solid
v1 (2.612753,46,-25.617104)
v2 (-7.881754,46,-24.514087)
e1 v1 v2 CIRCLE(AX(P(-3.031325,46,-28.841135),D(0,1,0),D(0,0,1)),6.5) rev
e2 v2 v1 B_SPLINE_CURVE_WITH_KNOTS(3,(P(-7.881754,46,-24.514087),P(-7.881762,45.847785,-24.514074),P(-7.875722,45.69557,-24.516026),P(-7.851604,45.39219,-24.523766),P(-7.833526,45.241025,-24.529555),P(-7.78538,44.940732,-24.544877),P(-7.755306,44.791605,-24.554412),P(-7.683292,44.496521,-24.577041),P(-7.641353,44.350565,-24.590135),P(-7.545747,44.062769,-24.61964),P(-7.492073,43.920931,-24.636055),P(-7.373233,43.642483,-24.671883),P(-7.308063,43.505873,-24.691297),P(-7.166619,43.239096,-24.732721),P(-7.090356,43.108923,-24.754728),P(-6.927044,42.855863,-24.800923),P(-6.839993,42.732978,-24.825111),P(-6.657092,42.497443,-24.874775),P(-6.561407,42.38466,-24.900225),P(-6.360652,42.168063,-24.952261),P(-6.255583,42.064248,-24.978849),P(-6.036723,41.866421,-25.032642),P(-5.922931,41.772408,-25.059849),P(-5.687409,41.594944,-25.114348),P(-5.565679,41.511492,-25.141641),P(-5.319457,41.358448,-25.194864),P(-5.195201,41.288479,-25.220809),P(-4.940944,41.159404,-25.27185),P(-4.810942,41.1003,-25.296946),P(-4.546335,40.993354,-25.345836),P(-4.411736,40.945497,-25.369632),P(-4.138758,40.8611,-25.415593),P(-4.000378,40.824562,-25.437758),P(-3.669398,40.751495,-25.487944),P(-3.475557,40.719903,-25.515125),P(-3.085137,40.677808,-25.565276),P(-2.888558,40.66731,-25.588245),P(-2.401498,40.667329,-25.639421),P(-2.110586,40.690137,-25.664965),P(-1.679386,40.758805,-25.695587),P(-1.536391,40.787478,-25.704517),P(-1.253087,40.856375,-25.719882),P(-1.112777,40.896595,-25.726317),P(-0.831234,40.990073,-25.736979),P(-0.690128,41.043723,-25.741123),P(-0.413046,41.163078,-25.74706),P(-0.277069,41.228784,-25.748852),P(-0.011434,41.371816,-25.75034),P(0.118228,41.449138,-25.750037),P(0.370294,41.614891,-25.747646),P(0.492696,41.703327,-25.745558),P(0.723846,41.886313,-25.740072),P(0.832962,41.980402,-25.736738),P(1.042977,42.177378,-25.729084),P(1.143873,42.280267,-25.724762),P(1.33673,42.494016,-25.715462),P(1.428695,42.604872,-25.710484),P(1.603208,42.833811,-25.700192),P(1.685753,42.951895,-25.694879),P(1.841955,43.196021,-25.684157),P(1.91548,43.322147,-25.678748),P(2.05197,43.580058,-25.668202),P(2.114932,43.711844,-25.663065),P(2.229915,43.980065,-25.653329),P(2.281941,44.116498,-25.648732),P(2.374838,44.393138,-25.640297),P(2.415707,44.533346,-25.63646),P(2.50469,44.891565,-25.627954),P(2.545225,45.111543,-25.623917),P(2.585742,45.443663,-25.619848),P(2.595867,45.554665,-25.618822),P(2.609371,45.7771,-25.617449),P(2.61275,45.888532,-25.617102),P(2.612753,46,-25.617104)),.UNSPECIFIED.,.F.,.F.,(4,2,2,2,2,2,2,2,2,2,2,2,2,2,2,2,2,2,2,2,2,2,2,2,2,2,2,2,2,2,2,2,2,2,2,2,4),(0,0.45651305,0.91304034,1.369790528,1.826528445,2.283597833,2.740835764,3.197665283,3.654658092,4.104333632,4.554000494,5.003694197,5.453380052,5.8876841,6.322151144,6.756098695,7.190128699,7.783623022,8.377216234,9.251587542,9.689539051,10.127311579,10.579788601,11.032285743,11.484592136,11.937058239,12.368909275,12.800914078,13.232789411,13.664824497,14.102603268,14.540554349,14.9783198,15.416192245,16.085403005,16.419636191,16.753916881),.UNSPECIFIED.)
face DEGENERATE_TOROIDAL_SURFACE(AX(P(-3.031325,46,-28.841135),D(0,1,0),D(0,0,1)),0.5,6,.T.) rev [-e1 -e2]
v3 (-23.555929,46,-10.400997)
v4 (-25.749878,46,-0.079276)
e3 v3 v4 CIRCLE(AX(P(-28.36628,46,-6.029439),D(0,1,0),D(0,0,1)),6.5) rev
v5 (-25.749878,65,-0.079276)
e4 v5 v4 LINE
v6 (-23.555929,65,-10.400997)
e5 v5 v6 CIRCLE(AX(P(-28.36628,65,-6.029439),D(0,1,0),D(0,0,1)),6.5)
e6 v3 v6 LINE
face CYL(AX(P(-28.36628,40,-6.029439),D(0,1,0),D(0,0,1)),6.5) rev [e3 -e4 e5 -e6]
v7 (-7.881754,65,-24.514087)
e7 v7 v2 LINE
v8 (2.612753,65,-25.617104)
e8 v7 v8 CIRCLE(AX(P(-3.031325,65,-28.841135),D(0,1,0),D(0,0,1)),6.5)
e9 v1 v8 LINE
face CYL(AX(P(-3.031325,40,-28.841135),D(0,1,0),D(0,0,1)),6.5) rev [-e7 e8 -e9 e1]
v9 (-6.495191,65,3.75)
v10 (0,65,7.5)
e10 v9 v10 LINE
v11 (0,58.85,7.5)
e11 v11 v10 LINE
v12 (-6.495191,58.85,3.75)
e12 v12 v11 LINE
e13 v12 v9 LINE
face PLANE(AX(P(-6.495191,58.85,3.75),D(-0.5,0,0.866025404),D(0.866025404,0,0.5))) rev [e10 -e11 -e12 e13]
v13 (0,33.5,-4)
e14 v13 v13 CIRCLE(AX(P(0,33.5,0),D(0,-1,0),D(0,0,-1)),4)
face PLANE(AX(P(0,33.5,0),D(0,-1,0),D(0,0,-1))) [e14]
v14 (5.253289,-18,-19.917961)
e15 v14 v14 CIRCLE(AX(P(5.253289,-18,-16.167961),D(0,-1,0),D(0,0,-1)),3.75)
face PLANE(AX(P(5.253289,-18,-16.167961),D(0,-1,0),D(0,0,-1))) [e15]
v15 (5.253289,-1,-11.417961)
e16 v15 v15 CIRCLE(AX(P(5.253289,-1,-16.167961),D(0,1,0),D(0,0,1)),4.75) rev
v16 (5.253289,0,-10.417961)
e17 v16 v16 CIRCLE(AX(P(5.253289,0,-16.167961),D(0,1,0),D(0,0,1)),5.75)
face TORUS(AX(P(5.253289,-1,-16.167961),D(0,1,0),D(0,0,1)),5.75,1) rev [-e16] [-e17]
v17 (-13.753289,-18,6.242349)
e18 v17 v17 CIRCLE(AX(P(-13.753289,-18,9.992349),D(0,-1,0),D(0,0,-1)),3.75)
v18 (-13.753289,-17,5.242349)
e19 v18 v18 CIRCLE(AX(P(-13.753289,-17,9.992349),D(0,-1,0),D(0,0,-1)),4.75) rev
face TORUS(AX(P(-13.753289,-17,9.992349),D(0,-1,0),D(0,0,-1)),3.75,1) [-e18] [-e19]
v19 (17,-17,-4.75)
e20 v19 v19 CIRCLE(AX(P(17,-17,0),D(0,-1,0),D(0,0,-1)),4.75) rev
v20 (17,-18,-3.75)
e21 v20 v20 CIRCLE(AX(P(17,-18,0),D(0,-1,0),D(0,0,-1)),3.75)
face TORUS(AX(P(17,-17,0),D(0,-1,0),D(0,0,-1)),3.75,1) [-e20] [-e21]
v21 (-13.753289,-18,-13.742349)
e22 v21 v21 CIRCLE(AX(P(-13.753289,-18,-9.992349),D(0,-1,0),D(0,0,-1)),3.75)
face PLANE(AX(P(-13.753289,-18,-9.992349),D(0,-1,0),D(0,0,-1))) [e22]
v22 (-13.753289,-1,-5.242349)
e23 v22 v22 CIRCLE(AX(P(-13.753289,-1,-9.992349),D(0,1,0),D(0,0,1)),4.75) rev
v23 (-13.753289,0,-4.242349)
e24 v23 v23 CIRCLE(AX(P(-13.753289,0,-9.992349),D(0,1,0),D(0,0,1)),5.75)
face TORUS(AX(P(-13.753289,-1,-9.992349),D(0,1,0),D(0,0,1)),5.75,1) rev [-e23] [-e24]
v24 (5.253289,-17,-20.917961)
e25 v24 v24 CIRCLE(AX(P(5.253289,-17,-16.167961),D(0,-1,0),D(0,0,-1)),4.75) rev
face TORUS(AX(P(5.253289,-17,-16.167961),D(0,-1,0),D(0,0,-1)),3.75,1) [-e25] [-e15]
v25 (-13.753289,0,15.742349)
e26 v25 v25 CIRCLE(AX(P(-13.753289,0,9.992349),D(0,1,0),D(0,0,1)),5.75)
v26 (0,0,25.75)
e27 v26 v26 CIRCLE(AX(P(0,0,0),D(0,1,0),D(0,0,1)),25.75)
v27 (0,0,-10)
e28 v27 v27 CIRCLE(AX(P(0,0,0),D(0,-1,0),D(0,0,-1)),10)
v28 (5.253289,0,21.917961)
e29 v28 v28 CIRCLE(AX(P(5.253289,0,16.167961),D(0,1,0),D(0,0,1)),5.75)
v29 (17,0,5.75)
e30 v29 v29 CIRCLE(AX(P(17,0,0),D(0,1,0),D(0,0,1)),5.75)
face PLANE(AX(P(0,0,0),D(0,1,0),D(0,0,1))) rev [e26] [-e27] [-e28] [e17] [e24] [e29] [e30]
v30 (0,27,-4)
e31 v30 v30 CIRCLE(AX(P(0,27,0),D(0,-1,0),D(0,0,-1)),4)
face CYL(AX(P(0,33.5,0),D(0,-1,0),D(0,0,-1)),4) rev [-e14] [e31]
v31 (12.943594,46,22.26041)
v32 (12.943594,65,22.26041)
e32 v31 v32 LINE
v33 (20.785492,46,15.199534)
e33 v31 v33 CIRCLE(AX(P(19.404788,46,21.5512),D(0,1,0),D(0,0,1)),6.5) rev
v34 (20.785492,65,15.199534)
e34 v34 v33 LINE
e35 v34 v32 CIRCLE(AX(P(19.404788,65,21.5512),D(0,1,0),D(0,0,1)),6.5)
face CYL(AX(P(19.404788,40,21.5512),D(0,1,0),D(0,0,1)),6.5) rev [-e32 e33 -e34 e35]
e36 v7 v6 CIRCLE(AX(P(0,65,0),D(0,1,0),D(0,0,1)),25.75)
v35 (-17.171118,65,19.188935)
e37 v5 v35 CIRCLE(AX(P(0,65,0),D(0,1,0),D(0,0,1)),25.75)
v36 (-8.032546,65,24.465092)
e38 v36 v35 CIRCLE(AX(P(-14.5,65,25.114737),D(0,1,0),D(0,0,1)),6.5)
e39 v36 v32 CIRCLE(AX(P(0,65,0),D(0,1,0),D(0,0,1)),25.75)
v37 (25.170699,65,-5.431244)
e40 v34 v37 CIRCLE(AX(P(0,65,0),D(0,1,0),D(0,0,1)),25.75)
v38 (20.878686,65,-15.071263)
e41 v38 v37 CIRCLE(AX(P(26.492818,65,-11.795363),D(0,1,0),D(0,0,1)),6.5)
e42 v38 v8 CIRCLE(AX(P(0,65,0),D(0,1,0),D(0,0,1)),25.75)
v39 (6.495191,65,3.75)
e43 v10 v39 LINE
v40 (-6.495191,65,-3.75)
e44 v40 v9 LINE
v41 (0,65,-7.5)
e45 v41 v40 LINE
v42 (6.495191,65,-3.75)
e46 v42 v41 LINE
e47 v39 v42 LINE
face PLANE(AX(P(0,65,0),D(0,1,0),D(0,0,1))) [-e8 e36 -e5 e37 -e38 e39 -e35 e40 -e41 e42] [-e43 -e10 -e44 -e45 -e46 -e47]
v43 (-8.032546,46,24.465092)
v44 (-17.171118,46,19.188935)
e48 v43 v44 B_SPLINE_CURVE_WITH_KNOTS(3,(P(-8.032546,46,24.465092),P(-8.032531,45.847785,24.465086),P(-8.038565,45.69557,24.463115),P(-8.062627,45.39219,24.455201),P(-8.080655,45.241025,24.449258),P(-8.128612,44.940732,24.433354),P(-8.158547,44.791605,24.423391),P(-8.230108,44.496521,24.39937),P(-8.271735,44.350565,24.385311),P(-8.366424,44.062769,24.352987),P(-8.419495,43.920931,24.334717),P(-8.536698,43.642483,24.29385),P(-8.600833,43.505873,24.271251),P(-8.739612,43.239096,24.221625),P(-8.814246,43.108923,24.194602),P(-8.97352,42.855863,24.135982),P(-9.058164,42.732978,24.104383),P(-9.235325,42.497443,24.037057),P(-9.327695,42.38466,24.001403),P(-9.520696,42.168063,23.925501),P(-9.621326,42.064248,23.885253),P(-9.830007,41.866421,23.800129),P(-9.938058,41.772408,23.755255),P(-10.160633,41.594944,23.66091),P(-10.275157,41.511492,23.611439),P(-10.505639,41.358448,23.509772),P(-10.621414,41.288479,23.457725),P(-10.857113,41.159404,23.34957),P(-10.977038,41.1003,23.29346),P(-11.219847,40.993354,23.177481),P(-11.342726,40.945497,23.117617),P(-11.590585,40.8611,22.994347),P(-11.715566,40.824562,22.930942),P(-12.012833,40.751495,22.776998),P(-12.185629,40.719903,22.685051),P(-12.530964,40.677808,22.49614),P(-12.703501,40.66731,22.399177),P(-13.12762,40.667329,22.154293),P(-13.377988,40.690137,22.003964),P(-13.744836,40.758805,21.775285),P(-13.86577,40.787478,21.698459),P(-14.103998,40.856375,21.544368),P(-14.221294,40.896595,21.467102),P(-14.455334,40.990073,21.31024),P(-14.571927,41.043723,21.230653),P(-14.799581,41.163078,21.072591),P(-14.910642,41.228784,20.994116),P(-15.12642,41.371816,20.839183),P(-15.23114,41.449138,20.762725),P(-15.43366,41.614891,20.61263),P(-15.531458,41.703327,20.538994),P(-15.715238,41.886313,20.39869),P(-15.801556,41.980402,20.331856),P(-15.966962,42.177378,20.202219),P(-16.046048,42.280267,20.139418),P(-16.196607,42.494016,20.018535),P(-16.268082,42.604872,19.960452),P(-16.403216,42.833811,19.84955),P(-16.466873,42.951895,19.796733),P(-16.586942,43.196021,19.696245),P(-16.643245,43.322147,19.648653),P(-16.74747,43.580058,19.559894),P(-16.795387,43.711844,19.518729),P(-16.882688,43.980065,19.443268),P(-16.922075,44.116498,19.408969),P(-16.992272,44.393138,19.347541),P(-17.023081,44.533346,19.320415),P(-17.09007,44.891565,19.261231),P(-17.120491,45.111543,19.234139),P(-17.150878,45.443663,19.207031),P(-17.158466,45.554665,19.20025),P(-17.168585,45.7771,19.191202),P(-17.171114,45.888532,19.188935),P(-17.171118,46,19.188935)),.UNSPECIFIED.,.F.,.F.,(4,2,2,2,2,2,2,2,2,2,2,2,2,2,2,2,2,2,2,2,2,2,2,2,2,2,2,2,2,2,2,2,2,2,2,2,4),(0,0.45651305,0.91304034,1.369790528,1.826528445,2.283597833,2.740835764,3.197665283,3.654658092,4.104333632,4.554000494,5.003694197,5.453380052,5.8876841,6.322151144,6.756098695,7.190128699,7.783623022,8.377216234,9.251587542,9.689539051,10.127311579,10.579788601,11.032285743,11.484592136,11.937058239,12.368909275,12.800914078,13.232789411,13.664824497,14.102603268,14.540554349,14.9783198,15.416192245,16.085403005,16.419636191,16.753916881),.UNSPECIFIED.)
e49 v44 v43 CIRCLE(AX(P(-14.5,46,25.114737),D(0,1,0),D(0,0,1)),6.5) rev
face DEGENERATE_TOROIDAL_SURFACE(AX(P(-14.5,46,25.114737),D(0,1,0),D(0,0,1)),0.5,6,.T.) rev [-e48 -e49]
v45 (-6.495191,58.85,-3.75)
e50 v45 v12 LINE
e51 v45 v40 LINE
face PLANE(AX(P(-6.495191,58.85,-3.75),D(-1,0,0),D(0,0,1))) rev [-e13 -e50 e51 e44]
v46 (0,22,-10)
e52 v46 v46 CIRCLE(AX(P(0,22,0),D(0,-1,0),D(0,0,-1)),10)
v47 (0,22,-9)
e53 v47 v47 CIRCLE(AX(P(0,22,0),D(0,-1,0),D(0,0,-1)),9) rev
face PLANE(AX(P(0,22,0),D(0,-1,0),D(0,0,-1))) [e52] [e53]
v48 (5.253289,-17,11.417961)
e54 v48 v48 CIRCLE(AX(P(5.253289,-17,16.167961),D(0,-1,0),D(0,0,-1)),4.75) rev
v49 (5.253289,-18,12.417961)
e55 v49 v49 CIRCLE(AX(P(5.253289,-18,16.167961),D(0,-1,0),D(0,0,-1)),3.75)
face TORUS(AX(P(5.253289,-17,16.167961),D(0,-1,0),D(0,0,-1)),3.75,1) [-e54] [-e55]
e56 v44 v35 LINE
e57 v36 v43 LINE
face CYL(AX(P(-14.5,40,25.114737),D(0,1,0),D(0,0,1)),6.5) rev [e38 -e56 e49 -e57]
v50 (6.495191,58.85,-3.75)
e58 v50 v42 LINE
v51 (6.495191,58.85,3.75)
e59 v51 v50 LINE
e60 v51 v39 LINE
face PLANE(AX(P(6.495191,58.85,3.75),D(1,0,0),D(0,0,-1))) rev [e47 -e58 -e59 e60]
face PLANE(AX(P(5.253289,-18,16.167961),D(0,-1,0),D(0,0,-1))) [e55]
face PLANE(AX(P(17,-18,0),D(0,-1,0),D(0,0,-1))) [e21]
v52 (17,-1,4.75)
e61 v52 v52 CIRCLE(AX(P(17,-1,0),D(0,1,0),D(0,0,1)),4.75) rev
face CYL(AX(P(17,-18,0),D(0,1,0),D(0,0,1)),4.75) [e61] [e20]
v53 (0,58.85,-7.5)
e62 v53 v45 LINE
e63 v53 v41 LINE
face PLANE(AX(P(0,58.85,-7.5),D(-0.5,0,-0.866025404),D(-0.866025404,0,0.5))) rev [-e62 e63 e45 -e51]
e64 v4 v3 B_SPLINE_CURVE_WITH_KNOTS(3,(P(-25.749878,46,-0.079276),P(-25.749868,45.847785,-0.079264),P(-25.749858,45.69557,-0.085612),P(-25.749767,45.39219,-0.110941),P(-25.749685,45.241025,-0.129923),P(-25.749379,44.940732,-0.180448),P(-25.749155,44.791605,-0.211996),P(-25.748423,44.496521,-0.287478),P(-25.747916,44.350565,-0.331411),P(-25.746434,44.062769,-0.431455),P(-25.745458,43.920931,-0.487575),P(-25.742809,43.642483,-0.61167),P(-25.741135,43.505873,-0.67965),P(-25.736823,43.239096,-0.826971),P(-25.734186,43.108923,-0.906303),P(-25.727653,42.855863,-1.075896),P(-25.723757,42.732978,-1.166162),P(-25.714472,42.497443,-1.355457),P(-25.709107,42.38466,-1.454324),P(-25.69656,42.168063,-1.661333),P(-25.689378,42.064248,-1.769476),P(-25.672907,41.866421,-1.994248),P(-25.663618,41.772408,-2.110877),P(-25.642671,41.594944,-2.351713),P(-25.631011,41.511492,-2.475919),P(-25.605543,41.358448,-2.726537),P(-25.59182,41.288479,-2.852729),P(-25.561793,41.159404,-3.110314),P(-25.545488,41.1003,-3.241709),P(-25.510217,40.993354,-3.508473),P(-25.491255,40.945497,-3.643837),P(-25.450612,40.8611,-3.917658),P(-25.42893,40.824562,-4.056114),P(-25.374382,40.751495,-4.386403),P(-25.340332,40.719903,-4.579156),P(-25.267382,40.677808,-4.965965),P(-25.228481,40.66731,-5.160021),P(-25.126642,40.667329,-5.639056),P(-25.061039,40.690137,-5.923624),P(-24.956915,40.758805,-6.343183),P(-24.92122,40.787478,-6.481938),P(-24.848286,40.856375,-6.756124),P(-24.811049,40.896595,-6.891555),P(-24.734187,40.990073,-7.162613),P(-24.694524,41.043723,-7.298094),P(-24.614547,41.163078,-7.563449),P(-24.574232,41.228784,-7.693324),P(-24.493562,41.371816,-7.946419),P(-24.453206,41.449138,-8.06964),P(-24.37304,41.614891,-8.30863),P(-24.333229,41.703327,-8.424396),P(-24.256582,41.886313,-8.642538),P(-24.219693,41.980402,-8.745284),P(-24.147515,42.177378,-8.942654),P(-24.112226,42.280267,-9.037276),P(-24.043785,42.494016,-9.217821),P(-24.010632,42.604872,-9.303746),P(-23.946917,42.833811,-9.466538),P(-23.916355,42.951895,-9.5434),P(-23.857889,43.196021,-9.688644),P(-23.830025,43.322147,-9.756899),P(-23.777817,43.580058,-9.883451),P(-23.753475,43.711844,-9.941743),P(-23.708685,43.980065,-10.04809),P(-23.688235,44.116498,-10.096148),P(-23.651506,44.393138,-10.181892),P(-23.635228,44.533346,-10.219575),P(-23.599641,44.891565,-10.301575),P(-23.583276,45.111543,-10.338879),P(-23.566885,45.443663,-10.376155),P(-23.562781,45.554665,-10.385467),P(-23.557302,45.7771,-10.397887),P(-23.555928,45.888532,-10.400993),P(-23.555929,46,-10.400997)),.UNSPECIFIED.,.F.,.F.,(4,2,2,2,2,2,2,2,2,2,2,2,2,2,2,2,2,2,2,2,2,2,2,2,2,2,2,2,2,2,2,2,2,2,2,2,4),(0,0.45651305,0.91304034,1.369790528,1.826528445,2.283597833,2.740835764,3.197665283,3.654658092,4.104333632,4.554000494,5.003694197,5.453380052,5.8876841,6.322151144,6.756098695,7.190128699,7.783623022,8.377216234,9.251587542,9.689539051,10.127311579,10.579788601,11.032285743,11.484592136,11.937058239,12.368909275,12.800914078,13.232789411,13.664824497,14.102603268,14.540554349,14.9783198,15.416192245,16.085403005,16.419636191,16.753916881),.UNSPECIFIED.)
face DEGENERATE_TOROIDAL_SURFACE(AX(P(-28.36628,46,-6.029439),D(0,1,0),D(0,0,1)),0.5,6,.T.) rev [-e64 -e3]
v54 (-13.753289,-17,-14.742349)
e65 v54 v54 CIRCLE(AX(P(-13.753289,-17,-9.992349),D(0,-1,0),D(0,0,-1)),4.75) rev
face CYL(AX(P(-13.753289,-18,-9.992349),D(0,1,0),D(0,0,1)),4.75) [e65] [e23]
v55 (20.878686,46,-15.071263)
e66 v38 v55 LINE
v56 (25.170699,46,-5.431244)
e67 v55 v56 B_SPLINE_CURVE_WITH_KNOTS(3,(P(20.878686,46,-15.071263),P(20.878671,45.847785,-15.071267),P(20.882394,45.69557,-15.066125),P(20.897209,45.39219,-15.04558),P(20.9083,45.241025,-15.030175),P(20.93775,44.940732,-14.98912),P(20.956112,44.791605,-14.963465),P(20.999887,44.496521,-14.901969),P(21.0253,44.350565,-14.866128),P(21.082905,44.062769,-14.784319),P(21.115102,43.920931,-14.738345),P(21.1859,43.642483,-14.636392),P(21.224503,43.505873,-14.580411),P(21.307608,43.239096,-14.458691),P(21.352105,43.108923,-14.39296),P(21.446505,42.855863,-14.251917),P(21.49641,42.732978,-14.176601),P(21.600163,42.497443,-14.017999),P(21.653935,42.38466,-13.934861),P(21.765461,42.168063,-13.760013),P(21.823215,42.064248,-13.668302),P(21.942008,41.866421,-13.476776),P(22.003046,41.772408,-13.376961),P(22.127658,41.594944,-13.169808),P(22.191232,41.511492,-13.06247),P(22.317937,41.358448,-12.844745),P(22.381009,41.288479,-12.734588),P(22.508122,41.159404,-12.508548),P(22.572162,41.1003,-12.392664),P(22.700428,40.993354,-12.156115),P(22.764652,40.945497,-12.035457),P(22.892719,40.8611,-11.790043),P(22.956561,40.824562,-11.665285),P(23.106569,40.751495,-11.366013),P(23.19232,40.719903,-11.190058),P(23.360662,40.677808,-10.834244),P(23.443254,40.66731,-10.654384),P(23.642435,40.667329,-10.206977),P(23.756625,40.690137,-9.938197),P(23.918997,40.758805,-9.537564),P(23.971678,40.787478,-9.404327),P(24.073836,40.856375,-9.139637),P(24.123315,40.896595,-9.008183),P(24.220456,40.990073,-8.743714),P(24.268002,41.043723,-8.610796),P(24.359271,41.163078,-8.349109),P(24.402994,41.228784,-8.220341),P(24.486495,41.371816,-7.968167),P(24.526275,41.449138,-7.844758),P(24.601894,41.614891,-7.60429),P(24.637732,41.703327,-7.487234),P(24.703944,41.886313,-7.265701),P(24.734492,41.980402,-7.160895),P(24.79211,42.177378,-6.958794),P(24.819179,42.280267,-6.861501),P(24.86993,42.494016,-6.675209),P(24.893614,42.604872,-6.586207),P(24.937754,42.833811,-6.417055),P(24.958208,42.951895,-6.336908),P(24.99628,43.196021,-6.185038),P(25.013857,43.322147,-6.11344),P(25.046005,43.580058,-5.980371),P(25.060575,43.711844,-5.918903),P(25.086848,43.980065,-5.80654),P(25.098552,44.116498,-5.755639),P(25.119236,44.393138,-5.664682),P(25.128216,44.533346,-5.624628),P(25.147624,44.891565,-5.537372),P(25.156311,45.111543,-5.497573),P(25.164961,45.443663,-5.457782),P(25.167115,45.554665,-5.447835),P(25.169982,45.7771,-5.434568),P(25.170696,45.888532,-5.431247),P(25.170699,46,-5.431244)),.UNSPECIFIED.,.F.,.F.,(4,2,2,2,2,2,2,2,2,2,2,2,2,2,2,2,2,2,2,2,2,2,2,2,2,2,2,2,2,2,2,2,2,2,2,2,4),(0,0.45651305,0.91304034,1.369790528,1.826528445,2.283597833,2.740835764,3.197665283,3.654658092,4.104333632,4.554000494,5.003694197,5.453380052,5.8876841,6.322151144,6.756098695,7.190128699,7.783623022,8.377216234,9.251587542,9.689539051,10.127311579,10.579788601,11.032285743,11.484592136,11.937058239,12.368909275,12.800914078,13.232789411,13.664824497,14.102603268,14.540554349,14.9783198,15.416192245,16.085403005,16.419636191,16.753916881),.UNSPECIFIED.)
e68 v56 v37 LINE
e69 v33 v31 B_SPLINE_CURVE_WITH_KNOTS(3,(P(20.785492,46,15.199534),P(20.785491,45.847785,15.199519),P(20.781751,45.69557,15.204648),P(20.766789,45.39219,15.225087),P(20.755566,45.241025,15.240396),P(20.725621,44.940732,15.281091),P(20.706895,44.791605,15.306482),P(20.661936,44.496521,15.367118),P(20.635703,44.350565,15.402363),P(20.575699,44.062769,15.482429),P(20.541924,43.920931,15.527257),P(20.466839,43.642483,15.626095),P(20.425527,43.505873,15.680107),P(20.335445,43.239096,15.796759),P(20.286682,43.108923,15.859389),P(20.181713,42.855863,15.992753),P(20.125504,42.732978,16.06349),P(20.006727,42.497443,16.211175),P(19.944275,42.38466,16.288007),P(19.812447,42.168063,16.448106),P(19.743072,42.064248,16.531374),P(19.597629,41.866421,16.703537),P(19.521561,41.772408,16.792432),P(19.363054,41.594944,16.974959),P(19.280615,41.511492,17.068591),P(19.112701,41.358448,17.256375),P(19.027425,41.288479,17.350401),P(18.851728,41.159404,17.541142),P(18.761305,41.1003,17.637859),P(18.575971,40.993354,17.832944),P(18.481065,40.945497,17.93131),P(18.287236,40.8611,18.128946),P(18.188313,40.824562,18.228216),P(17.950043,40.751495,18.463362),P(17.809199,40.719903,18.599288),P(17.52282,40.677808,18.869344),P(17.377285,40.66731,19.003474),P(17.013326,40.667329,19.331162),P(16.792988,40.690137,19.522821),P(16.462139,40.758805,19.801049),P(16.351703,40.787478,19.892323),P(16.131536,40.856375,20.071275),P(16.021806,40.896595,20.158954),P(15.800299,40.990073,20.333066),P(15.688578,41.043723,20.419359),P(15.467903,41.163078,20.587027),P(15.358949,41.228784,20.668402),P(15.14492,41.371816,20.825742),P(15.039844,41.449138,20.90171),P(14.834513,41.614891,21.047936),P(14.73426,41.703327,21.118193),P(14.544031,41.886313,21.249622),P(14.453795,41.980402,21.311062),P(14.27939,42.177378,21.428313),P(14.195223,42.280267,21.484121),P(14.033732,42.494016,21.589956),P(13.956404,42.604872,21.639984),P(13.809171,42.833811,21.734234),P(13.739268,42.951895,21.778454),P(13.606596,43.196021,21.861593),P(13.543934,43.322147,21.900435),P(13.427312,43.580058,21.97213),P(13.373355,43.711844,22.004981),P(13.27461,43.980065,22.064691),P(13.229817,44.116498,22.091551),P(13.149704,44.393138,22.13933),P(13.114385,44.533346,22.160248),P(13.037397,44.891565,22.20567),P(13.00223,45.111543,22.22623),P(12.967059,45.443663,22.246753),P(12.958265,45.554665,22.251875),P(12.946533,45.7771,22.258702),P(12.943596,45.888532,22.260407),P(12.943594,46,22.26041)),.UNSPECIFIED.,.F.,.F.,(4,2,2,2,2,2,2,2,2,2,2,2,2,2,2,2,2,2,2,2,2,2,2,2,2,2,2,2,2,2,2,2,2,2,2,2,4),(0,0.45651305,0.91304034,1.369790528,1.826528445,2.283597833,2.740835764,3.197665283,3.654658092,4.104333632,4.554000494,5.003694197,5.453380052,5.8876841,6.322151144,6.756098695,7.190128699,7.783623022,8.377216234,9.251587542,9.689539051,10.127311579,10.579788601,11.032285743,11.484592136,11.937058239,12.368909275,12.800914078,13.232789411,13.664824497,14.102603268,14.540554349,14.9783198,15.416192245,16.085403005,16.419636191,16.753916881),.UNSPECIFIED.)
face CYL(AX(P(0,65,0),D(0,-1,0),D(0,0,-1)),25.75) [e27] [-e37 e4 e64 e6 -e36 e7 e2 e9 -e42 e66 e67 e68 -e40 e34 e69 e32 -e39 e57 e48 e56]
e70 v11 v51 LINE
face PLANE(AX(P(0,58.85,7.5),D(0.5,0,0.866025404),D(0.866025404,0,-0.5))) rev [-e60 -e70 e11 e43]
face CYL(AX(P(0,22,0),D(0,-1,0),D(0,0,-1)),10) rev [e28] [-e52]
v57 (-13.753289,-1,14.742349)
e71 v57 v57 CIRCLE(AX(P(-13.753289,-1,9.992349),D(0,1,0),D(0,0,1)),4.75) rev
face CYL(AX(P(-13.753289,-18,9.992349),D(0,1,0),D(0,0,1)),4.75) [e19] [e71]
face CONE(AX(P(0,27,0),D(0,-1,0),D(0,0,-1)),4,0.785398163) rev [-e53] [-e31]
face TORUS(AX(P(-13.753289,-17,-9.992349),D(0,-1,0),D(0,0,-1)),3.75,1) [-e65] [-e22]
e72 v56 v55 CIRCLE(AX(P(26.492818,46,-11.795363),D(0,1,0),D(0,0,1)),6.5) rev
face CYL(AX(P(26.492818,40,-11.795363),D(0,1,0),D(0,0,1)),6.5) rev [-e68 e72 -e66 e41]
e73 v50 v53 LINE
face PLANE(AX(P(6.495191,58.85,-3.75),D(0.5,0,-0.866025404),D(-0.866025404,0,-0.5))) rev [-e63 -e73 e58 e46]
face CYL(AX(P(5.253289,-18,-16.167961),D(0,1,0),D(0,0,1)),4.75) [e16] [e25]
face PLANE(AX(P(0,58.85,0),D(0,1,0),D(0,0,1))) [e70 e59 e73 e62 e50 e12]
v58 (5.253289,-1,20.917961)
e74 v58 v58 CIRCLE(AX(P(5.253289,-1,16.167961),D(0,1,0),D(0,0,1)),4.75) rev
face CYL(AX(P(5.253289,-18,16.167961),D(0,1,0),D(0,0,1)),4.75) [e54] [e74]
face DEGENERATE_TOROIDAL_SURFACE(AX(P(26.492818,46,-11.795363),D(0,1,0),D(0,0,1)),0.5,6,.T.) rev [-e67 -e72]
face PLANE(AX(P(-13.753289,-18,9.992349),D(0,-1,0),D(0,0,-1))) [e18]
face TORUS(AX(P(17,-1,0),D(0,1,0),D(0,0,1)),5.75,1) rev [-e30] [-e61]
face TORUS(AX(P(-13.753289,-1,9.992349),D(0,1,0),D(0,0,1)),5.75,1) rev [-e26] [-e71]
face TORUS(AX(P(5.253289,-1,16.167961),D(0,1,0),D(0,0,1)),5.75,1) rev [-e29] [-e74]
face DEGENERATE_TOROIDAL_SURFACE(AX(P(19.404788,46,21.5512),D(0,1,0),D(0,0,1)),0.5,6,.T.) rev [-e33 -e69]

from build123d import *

# Parameters (mm, degrees)
SKETCH1_R           = 25.75
BOSS_EXTRUDE1_DEPTH = 65
SKETCH2_R           = 4.75
BOSS_EXTRUDE2_DEPTH = 18
FILLET1_R           = 1
FILLET2_R           = 1
CUT_EXTRUDE1_DEPTH  = 6.15
SKETCH4_R           = 10
CUT_EXTRUDE2_DEPTH  = 22
SKETCH5_R           = 4
CUT_EXTRUDE3_DEPTH  = 11.5
CHAMFER2_SIZE       = 5
SKETCH6_R           = 6.5
CUT_EXTRUDE4_DEPTH  = 25
FILLET3_R           = 6


with BuildPart() as part:
    # Sketch1 → Boss-Extrude1 (new body)
    with BuildSketch(Plane(origin=(0, 0, 0), x_dir=(1, 0, 0), z_dir=(0, 1, 0))):
        with Locations(Location((0, 0, 0), (0, 0, 270))):
            Circle(SKETCH1_R)
    extrude(amount=BOSS_EXTRUDE1_DEPTH)

    # Sketch2 → Boss-Extrude2 (add)
    with BuildSketch(Plane.XZ):
        with Locations(Location((17, 0, 0), (0, 0, 90))):
            Circle(SKETCH2_R)
        with Locations(Location((5.253288904, -16.167960777, 0), (0, 0, 90))):
            Circle(SKETCH2_R)
        with Locations(Location((-13.753288904, -9.992349289, 0), (0, 0, 90))):
            Circle(SKETCH2_R)
        with Locations(Location((-13.753288904, 9.992349289, 0), (0, 0, 90))):
            Circle(SKETCH2_R)
        with Locations(Location((5.253288904, 16.167960777, 0), (0, 0, 90))):
            Circle(SKETCH2_R)
    extrude(amount=BOSS_EXTRUDE2_DEPTH)

    # Fillet1
    fillet1_edges = [part.edges().sort_by_distance(p)[0] for p in [
        (-13.753288904, 0, -14.742349289),
        (-13.753288904, 0, 5.242349289),
        (5.253288904, 0, 11.417960777),
        (17, 0, -4.75),
        (5.253288904, 0, -20.917960777),
    ]]
    fillet(fillet1_edges, radius=FILLET1_R)

    # Fillet2
    fillet2_edges = [part.edges().sort_by_distance(p)[0] for p in [
        (-13.753288904, -18, -14.742349289),
        (-13.753288904, -18, 5.242349289),
        (5.253288904, -18, 11.417960777),
        (17, -18, -4.75),
        (5.253288904, -18, -20.917960777),
    ]]
    fillet(fillet2_edges, radius=FILLET2_R)

    # Sketch3 → Cut-Extrude1 (cut)
    with BuildSketch(Plane(origin=(0, 65, 0), x_dir=(1, 0, 0), z_dir=(0, 1, 0))):
        Polygon((0, -7.5), (6.495190528, -3.75), (6.495190528, 3.75), (0, 7.5), (-6.495190528, 3.75), (-6.495190528, -3.75), align=None)
    extrude(amount=-CUT_EXTRUDE1_DEPTH, mode=Mode.SUBTRACT)

    # Sketch4 → Cut-Extrude2 (cut)
    with BuildSketch(Plane.XZ):
        with Locations(Location((0, 0, 0), (0, 0, 270))):
            Circle(SKETCH4_R)
    extrude(amount=-CUT_EXTRUDE2_DEPTH, mode=Mode.SUBTRACT)

    # Sketch5 → Cut-Extrude3 (cut)
    with BuildSketch(Plane.XZ.offset(-22)):
        with Locations(Location((0, 0, 0), (0, 0, 270))):
            Circle(SKETCH5_R)
    extrude(amount=-CUT_EXTRUDE3_DEPTH, mode=Mode.SUBTRACT)

    # Chamfer2
    chamfer2_edges = [part.edges().sort_by_distance(p)[0] for p in [
        (0, 22, 4),
    ]]
    chamfer(chamfer2_edges, length=CHAMFER2_SIZE)

    # Sketch6 → Cut-Extrude4 (cut)
    with BuildSketch(Plane(origin=(0, 65, 0), x_dir=(1, 0, 0), z_dir=(0, 1, 0))):
        with Locations((-14.5, -25.11473671)):
            Circle(SKETCH6_R)
        with Locations((-28.366280421, 6.029439034)):
            Circle(SKETCH6_R)
        with Locations((-3.031325435, 28.841134966)):
            Circle(SKETCH6_R)
        with Locations((26.492818272, 11.795362649)):
            Circle(SKETCH6_R)
        with Locations((19.404787584, -21.551199939)):
            Circle(SKETCH6_R)
    extrude(amount=-CUT_EXTRUDE4_DEPTH, mode=Mode.SUBTRACT)

    # Fillet3
    # the kernel refuses this fillet: 6 mm, written as the material it adds along each edge
    with BuildSketch(Plane(origin=(-14.5, 40, 25.11473671), x_dir=(-0.49727683802994654, 0, 0.8675919238668247), z_dir=(-0.8675919238668247, 0, -0.49727683802994654))) as fillet3_piece_1_section:
        with BuildLine():
            CenterArc((6.5 - FILLET3_R, FILLET3_R), FILLET3_R, 270, 90)
            Line((6.5, FILLET3_R), (6.5, 0))
            Line((6.5, 0), (6.5 - FILLET3_R, 0))
        make_face()
    fillet3_piece_1 = revolve(axis=Axis((-14.5, 40, 25.11473671), (0, 1, 0)), revolution_arc=359.64, mode=Mode.PRIVATE)
    fillet3_piece_1 = fillet3_piece_1 & Plane(origin=(0, 41.717626999, 0), x_dir=(0, 0, 1), z_dir=(0, -1, 0)) * Cylinder(25.75, 26, mode=Mode.PRIVATE)
    add(fillet3_piece_1)
    with BuildSketch(Plane(origin=(26.492818272, 40, -11.795362649), x_dir=(0.9122631507322388, 0, -0.40960461889008104), z_dir=(0.40960461889008104, 0, 0.9122631507322388))) as fillet3_piece_2_section:
        with BuildLine():
            CenterArc((6.5 - FILLET3_R, FILLET3_R), FILLET3_R, 270, 90)
            Line((6.5, FILLET3_R), (6.5, 0))
            Line((6.5, 0), (6.5 - FILLET3_R, 0))
        make_face()
    fillet3_piece_2 = revolve(axis=Axis((26.492818272, 40, -11.795362649), (0, 1, 0)), revolution_arc=359.64, mode=Mode.PRIVATE)
    fillet3_piece_2 = fillet3_piece_2 & Plane(origin=(0, 41.717626999, 0), x_dir=(0, 0, 1), z_dir=(0, -1, 0)) * Cylinder(25.75, 27, mode=Mode.PRIVATE)
    add(fillet3_piece_2)
    with BuildSketch(Plane(origin=(-3.031325435, 40, -28.841134966), x_dir=(-0.10765232498170882, 0, -0.9941886022913522), z_dir=(0.9941886022913522, 0, -0.10765232498170882))) as fillet3_piece_3_section:
        with BuildLine():
            CenterArc((6.5 - FILLET3_R, FILLET3_R), FILLET3_R, 270, 90)
            Line((6.5, FILLET3_R), (6.5, 0))
            Line((6.5, 0), (6.5 - FILLET3_R, 0))
        make_face()
    fillet3_piece_3 = revolve(axis=Axis((-3.031325435, 40, -28.841134966), (0, 1, 0)), revolution_arc=359.64, mode=Mode.PRIVATE)
    fillet3_piece_3 = fillet3_piece_3 & Plane(origin=(0, 41.717626999, 0), x_dir=(0, 0, 1), z_dir=(0, -1, 0)) * Cylinder(25.75, 26, mode=Mode.PRIVATE)
    add(fillet3_piece_3)
    with BuildSketch(Plane(origin=(-28.366280421, 40, -6.029439034), x_dir=(-0.9774896010068019, 0, -0.2109836010773427), z_dir=(-0.2109836010773427, 0, 0.9774896010068019))) as fillet3_piece_4_section:
        with BuildLine():
            CenterArc((6.5 - FILLET3_R, -FILLET3_R), FILLET3_R, 0, 90)
            Line((6.5, -FILLET3_R), (6.5, 0))
            Line((6.5, 0), (6.5 - FILLET3_R, 0))
        make_face()
    fillet3_piece_4 = revolve(axis=Axis((-28.366280421, 40, -6.029439034), (0, -1, 0)), revolution_arc=359.64, mode=Mode.PRIVATE)
    fillet3_piece_4 = fillet3_piece_4 & Plane(origin=(0, 41.717627119, 0), x_dir=(0, 0, 1), z_dir=(0, -1, 0)) * Cylinder(25.75, 27, mode=Mode.PRIVATE)
    add(fillet3_piece_4)
    with BuildSketch(Plane(origin=(19.404787584, 40, 21.551199939), x_dir=(0.6714619588183012, 0, 0.7410390258683345), z_dir=(-0.7410390258683345, 0, 0.6714619588183012))) as fillet3_piece_5_section:
        with BuildLine():
            CenterArc((6.5 - FILLET3_R, FILLET3_R), FILLET3_R, 270, 90)
            Line((6.5, FILLET3_R), (6.5, 0))
            Line((6.5, 0), (6.5 - FILLET3_R, 0))
        make_face()
    fillet3_piece_5 = revolve(axis=Axis((19.404787584, 40, 21.551199939), (0, 1, 0)), revolution_arc=359.64, mode=Mode.PRIVATE)
    fillet3_piece_5 = fillet3_piece_5 & Plane(origin=(0, 41.717626999, 0), x_dir=(0, 0, 1), z_dir=(0, -1, 0)) * Cylinder(25.75, 27, mode=Mode.PRIVATE)
    add(fillet3_piece_5)


solid = part.part
